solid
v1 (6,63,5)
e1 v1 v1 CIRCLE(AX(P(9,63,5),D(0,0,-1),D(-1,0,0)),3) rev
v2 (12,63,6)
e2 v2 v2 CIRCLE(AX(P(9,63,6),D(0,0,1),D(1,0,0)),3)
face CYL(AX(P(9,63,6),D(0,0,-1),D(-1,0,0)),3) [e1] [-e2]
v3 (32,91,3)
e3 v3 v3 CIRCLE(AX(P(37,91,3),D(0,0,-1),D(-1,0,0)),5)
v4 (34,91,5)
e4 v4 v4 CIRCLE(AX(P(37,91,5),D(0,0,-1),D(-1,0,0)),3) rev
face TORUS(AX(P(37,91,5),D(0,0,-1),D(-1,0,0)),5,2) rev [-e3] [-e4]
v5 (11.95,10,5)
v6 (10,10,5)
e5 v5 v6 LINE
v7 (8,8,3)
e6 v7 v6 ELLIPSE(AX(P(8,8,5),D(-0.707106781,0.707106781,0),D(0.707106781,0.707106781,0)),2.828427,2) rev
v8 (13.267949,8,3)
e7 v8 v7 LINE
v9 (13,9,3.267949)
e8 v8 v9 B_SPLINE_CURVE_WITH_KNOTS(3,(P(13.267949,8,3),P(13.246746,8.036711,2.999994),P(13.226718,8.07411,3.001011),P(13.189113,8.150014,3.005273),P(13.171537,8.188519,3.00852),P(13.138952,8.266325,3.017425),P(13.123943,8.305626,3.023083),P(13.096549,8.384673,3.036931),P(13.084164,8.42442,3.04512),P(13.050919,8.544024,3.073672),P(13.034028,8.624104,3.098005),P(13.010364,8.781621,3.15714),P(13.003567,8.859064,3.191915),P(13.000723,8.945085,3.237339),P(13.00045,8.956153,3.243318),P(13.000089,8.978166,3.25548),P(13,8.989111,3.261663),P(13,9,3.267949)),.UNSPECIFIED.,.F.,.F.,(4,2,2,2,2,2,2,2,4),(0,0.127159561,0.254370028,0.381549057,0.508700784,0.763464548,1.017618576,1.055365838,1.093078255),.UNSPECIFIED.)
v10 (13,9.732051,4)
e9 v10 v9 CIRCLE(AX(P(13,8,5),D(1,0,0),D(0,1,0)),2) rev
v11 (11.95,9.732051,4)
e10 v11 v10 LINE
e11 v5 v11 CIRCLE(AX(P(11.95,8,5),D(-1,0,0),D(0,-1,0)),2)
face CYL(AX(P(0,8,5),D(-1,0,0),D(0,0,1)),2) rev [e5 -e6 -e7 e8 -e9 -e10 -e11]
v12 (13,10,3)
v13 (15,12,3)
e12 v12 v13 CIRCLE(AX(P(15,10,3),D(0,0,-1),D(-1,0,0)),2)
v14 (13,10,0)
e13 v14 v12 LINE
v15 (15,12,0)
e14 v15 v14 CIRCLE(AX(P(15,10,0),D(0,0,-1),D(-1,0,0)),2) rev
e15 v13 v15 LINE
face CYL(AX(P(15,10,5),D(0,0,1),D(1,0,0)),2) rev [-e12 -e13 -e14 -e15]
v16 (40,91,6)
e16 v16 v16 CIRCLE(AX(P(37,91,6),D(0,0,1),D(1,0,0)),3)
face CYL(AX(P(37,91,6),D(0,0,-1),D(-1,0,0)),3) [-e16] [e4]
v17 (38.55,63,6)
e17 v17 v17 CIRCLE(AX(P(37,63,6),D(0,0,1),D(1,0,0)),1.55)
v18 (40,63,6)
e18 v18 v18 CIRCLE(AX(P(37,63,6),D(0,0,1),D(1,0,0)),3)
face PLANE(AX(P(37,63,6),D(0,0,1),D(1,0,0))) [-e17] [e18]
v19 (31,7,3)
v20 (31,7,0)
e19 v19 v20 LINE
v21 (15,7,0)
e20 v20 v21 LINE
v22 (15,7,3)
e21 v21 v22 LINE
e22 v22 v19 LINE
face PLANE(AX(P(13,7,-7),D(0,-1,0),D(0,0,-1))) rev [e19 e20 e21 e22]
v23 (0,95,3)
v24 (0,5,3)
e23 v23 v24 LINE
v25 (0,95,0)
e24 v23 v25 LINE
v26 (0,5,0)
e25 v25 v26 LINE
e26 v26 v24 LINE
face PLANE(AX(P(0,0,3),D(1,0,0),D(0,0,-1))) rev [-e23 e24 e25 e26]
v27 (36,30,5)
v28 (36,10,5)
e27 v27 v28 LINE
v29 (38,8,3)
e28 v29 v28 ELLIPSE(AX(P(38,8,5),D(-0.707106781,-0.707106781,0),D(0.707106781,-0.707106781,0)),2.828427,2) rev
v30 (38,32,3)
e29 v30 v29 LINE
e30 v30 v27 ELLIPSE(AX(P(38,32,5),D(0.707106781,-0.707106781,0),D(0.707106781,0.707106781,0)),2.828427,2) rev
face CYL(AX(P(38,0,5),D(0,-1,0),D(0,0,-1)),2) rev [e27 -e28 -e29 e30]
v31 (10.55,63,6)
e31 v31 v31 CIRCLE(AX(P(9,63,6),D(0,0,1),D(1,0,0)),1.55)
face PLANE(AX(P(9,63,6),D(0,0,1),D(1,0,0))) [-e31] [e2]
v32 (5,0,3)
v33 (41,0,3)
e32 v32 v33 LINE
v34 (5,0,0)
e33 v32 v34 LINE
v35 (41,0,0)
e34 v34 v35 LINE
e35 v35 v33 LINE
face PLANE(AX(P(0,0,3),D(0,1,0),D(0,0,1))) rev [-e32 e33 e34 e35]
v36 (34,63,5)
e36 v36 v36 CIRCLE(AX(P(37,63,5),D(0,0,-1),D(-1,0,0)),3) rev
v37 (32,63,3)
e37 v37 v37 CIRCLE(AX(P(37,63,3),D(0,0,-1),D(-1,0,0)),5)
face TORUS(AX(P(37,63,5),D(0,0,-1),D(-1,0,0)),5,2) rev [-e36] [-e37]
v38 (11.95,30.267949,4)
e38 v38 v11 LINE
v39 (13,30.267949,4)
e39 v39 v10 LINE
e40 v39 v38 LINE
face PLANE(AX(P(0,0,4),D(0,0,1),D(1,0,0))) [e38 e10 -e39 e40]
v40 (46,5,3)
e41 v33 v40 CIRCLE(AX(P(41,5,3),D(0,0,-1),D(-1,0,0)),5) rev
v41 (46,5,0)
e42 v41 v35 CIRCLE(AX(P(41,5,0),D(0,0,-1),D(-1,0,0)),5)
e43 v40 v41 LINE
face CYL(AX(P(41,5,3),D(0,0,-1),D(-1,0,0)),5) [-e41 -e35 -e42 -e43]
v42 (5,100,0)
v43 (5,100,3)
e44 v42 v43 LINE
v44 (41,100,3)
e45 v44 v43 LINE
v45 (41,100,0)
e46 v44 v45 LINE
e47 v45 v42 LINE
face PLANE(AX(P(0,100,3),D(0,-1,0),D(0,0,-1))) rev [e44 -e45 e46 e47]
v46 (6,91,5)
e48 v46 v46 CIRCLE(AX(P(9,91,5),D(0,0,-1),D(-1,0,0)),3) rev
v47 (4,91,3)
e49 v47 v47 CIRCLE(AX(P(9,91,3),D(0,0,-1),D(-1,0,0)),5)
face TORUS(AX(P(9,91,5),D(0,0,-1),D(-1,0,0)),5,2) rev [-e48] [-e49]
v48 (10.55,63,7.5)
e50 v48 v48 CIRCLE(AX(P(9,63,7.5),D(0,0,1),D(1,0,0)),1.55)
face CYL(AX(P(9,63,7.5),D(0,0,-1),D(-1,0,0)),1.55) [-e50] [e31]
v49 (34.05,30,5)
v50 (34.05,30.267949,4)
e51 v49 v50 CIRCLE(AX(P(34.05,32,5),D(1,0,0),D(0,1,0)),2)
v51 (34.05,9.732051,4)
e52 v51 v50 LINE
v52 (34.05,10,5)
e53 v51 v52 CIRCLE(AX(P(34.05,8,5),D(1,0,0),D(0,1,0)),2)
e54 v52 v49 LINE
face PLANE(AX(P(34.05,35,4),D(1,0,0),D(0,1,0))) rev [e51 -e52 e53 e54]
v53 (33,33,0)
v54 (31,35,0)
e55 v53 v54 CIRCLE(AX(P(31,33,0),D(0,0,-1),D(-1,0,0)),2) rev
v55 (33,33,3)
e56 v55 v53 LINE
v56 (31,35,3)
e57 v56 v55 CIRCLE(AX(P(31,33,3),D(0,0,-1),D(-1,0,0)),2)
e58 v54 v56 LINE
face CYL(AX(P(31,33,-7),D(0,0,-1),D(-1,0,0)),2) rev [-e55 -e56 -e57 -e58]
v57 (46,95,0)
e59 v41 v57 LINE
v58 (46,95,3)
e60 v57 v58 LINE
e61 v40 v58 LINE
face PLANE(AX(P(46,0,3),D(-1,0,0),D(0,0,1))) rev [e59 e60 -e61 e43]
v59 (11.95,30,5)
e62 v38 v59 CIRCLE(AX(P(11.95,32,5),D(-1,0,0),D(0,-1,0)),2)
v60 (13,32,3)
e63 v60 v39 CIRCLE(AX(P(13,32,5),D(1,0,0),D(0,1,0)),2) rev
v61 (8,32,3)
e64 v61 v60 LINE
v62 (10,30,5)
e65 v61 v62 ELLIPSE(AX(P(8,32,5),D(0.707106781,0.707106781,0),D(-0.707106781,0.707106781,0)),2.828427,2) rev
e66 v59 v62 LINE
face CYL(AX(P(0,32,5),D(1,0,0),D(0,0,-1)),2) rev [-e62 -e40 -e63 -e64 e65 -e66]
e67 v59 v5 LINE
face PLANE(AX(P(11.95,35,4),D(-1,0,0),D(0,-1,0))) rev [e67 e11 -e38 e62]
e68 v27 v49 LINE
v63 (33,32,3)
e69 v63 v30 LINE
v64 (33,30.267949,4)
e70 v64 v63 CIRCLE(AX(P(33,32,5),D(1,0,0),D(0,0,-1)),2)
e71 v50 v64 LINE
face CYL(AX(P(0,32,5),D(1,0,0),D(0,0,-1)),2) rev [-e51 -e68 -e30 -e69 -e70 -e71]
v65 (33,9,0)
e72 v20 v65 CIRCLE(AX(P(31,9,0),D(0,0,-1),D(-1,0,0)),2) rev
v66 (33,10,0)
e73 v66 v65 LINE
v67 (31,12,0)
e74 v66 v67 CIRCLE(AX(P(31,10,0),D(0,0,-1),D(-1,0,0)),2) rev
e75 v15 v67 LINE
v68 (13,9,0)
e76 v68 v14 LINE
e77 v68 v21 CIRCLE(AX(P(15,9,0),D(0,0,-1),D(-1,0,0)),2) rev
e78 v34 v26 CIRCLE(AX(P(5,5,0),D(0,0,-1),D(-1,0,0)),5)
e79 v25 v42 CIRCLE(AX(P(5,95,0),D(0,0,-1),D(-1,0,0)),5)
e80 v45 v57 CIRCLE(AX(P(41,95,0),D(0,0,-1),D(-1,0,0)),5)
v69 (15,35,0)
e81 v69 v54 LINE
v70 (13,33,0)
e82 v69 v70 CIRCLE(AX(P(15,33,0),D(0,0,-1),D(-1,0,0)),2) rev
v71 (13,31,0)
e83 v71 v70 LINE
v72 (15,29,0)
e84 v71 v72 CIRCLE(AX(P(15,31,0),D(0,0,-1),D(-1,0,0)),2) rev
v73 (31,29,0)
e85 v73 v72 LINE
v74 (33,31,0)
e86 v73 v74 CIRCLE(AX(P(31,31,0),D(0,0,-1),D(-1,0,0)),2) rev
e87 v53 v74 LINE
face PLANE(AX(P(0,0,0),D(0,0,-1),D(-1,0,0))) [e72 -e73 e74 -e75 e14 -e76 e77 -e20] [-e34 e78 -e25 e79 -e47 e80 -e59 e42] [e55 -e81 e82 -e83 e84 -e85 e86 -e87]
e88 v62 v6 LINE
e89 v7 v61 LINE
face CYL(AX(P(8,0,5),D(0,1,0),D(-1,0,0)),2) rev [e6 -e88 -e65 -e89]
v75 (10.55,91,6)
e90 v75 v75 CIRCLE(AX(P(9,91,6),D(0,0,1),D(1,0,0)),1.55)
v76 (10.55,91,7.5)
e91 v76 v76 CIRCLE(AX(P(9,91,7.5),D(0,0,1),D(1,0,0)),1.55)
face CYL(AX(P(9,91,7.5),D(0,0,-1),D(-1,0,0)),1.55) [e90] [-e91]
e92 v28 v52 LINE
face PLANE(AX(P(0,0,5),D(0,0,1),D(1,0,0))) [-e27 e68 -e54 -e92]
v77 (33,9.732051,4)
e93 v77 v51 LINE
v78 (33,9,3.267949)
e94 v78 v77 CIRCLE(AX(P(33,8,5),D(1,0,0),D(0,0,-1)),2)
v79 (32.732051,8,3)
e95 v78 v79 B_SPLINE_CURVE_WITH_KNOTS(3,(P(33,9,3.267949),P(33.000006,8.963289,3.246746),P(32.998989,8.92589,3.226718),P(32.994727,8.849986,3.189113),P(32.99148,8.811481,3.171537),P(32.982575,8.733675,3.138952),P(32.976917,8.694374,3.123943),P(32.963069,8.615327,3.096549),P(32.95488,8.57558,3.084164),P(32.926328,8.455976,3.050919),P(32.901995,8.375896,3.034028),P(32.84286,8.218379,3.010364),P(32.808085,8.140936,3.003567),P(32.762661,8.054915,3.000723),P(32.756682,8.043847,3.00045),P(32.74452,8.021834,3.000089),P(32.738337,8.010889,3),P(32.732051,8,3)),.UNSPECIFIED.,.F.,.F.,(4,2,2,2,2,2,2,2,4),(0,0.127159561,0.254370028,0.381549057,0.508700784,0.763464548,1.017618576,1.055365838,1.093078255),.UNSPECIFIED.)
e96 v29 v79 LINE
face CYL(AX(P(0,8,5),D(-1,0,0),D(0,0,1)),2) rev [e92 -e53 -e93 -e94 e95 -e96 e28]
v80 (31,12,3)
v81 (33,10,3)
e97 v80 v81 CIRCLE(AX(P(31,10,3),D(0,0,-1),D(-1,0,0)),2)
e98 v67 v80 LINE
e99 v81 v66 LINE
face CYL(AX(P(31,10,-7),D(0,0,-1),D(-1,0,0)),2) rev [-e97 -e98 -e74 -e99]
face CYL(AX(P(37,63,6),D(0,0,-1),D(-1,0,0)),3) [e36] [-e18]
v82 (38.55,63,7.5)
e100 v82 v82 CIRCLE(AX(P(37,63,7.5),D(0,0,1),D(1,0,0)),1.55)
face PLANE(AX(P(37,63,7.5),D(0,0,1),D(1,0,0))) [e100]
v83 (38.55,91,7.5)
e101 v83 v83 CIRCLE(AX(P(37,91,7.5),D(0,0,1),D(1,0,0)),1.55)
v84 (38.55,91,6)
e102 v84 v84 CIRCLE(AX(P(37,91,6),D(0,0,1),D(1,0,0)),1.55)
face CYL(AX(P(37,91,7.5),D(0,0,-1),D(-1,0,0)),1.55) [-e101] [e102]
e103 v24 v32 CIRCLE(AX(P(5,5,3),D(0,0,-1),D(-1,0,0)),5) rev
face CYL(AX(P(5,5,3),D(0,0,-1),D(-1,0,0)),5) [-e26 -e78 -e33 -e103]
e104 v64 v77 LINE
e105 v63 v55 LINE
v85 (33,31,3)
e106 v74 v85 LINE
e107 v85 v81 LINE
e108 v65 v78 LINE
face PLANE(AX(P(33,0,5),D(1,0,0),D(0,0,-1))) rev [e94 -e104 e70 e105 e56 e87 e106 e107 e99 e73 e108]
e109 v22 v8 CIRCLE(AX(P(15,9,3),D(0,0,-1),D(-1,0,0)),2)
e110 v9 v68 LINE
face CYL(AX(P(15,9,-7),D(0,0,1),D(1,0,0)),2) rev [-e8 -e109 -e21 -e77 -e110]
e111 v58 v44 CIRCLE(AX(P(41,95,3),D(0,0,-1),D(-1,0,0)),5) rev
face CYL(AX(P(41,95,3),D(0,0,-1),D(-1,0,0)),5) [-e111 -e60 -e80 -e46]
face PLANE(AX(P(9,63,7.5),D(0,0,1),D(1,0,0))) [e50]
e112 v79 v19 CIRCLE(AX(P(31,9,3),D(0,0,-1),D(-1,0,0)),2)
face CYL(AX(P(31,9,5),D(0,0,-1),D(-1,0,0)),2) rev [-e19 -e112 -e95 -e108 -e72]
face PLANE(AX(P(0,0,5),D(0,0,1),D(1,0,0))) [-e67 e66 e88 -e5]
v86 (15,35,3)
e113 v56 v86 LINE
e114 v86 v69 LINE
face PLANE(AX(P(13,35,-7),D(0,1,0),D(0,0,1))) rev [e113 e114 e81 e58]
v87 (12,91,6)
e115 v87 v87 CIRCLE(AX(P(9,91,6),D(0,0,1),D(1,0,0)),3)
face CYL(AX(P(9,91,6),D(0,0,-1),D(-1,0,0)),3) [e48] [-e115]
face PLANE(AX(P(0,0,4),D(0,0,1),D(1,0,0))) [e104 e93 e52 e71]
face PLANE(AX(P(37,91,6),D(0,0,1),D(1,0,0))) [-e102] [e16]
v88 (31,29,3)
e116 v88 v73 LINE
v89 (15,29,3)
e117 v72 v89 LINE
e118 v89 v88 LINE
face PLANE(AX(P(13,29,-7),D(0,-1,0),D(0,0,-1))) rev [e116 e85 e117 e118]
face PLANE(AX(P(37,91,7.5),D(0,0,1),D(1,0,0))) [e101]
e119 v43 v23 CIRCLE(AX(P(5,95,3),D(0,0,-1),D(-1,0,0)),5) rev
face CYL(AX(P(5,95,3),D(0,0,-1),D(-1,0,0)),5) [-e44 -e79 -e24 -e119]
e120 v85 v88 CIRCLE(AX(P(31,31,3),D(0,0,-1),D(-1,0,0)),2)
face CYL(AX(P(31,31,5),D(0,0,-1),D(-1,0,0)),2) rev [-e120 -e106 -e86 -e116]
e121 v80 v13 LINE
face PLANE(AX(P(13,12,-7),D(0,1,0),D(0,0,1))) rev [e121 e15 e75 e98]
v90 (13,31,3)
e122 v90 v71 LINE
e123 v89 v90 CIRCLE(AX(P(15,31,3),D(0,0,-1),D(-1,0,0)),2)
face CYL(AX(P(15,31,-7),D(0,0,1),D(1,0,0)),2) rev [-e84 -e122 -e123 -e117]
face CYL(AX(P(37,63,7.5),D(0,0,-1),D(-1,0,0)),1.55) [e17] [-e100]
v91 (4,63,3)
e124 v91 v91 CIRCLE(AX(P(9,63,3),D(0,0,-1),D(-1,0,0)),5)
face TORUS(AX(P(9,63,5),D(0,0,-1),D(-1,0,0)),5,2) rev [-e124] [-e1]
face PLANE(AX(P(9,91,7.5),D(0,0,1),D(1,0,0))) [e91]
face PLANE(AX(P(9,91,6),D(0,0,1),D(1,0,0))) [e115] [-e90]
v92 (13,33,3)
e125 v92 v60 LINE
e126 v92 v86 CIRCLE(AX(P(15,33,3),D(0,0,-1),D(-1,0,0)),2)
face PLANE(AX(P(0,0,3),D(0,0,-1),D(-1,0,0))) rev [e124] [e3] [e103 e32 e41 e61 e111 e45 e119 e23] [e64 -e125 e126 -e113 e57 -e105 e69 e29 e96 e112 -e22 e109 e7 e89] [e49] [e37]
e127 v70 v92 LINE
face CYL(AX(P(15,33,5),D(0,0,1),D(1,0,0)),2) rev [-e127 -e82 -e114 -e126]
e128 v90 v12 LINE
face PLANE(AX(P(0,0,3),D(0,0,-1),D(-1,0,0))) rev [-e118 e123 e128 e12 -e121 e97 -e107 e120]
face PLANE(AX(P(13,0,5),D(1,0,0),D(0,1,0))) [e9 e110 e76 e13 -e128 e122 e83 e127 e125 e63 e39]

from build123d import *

# Parameters (mm, degrees)
SKETCH_1_W          = 46
SKETCH_1_H          = 100
EXTRUDE_1_DEPTH     = 3
SKETCH_2_R          = 3
EXTRUDE_2_DEPTH     = 3
SKETCH_3_R          = 1.55
EXTRUDE_3_DEPTH     = 1.5
FILLET_1_R          = 2
FILLET_2_R          = 5
SKETCH_4_W          = 2
SKETCH_4_H          = 20
SKETCH_4_W_2        = 1
EXTRUDE_4_DEPTH     = 2
SKETCH_5_W          = 22.1
SKETCH_5_H          = 30
CUT_EXTRUDE_1_DEPTH = 1
FILLET_3_R          = 2
SKETCH_6_W          = 20
SKETCH_6_H          = 6
SKETCH_6_H_2        = 5
CUT_EXTRUDE_2_DEPTH = 10
FILLET_4_R          = 2


with BuildPart() as part:
    # ｽｹｯﾁ1 → ﾎﾞｽ - 押し出し1 (new body)
    with BuildSketch(Plane.XY):
        with Locations((23, 50)):
            Rectangle(SKETCH_1_W, SKETCH_1_H)
    extrude(amount=EXTRUDE_1_DEPTH)

    # ｽｹｯﾁ2 → ﾎﾞｽ - 押し出し2 (add)
    with BuildSketch(Plane.XY.offset(3)):
        with Locations(Location((9, 91, 0), (0, 0, 180))):
            Circle(SKETCH_2_R)
        with Locations(Location((37, 91, 0), (0, 0, 180))):
            Circle(SKETCH_2_R)
        with Locations(Location((9, 63, 0), (0, 0, 180))):
            Circle(SKETCH_2_R)
        with Locations(Location((37, 63, 0), (0, 0, 180))):
            Circle(SKETCH_2_R)
    extrude(amount=EXTRUDE_2_DEPTH)

    # ｽｹｯﾁ3 → ﾎﾞｽ - 押し出し3 (add)
    with BuildSketch(Plane.XY.offset(6)):
        with Locations((9, 91)):
            Circle(SKETCH_3_R)
        with Locations((37, 91)):
            Circle(SKETCH_3_R)
        with Locations((9, 63)):
            Circle(SKETCH_3_R)
        with Locations((37, 63)):
            Circle(SKETCH_3_R)
    extrude(amount=EXTRUDE_3_DEPTH)

    # ﾌｨﾚｯﾄ1
    fillet_1_edges = [part.edges().sort_by_distance(p)[0] for p in [
        (12, 91, 3),
        (40, 91, 3),
        (12, 63, 3),
        (40, 63, 3),
    ]]
    fillet(fillet_1_edges, radius=FILLET_1_R)

    # ﾌｨﾚｯﾄ2
    fillet_2_edges = [part.edges().sort_by_distance(p)[0] for p in [
        (0, 100, 1.5),
        (46, 100, 1.5),
        (46, 0, 1.5),
        (0, 0, 1.5),
    ]]
    fillet(fillet_2_edges, radius=FILLET_2_R)

    # ｽｹｯﾁ4 → ﾎﾞｽ - 押し出し4 (add)
    with BuildSketch(Plane.XY.offset(3)):
        with Locations((11, 20)):
            Rectangle(SKETCH_4_W, SKETCH_4_H)
        with Locations((12.5, 20)):
            Rectangle(SKETCH_4_W_2, SKETCH_4_H)
        with Locations((33.5, 20)):
            Rectangle(SKETCH_4_W_2, SKETCH_4_H)
        with Locations((35, 20)):
            Rectangle(SKETCH_4_W, SKETCH_4_H)
    extrude(amount=EXTRUDE_4_DEPTH)

    # ｽｹｯﾁ5 → ｶｯﾄ - 押し出し1 (cut)
    with BuildSketch(Plane.XY.offset(5)):
        with Locations((23, 20)):
            Rectangle(SKETCH_5_W, SKETCH_5_H)
    extrude(amount=-CUT_EXTRUDE_1_DEPTH, mode=Mode.SUBTRACT)

    # ﾌｨﾚｯﾄ3
    fillet_3_edges = [part.edges().sort_by_distance(p)[0] for p in [
        (11.5, 30, 3),
    ]]
    fillet(fillet_3_edges, radius=FILLET_3_R - 0.0001)  # a hair under: the kernel refuses the full size
    fillet_3_2_edges = [part.edges().sort_by_distance(p)[0] for p in [
        (10, 20, 3),
    ]]
    fillet(fillet_3_2_edges, radius=FILLET_3_R - 0.0001)  # a hair under: the kernel refuses the full size
    fillet_3_3_edges = [part.edges().sort_by_distance(p)[0] for p in [
        (11.5, 10, 3),
    ]]
    fillet(fillet_3_3_edges, radius=FILLET_3_R - 0.0001)  # a hair under: the kernel refuses the full size
    fillet_3_4_edges = [part.edges().sort_by_distance(p)[0] for p in [
        (34.5, 30, 3),
    ]]
    fillet(fillet_3_4_edges, radius=FILLET_3_R - 0.0004)  # a hair under: the kernel refuses the full size
    fillet_3_5_edges = [part.edges().sort_by_distance(p)[0] for p in [
        (34.5, 10, 3),
    ]]
    fillet(fillet_3_5_edges, radius=FILLET_3_R - 0.0004)  # a hair under: the kernel refuses the full size
    fillet_3_6_edges = [part.edges().sort_by_distance(p)[0] for p in [
        (36, 20, 3),
    ]]
    fillet(fillet_3_6_edges, radius=FILLET_3_R - 0.0004)  # a hair under: the kernel refuses the full size

    # ｽｹｯﾁ6 → ｶｯﾄ - 押し出し2 (cut)
    with BuildSketch(Plane.XY.offset(3)):
        with Locations((23, 32)):
            Rectangle(SKETCH_6_W, SKETCH_6_H)
        with Locations((23, 9.5)):
            Rectangle(SKETCH_6_W, SKETCH_6_H_2)
    extrude(amount=-CUT_EXTRUDE_2_DEPTH, mode=Mode.SUBTRACT)

    # ﾌｨﾚｯﾄ4
    fillet_4_edges = [part.edges().sort_by_distance(p)[0] for p in [
        (13, 29, 1.5),
        (13, 35, 1.5),
        (33, 35, 1.5),
        (33, 29, 1.5),
        (13, 7, 1.5),
        (13, 12, 1.5),
        (33, 12, 1.5),
        (33, 7, 1.5),
    ]]
    fillet(fillet_4_edges, radius=FILLET_4_R)


solid = part.part
